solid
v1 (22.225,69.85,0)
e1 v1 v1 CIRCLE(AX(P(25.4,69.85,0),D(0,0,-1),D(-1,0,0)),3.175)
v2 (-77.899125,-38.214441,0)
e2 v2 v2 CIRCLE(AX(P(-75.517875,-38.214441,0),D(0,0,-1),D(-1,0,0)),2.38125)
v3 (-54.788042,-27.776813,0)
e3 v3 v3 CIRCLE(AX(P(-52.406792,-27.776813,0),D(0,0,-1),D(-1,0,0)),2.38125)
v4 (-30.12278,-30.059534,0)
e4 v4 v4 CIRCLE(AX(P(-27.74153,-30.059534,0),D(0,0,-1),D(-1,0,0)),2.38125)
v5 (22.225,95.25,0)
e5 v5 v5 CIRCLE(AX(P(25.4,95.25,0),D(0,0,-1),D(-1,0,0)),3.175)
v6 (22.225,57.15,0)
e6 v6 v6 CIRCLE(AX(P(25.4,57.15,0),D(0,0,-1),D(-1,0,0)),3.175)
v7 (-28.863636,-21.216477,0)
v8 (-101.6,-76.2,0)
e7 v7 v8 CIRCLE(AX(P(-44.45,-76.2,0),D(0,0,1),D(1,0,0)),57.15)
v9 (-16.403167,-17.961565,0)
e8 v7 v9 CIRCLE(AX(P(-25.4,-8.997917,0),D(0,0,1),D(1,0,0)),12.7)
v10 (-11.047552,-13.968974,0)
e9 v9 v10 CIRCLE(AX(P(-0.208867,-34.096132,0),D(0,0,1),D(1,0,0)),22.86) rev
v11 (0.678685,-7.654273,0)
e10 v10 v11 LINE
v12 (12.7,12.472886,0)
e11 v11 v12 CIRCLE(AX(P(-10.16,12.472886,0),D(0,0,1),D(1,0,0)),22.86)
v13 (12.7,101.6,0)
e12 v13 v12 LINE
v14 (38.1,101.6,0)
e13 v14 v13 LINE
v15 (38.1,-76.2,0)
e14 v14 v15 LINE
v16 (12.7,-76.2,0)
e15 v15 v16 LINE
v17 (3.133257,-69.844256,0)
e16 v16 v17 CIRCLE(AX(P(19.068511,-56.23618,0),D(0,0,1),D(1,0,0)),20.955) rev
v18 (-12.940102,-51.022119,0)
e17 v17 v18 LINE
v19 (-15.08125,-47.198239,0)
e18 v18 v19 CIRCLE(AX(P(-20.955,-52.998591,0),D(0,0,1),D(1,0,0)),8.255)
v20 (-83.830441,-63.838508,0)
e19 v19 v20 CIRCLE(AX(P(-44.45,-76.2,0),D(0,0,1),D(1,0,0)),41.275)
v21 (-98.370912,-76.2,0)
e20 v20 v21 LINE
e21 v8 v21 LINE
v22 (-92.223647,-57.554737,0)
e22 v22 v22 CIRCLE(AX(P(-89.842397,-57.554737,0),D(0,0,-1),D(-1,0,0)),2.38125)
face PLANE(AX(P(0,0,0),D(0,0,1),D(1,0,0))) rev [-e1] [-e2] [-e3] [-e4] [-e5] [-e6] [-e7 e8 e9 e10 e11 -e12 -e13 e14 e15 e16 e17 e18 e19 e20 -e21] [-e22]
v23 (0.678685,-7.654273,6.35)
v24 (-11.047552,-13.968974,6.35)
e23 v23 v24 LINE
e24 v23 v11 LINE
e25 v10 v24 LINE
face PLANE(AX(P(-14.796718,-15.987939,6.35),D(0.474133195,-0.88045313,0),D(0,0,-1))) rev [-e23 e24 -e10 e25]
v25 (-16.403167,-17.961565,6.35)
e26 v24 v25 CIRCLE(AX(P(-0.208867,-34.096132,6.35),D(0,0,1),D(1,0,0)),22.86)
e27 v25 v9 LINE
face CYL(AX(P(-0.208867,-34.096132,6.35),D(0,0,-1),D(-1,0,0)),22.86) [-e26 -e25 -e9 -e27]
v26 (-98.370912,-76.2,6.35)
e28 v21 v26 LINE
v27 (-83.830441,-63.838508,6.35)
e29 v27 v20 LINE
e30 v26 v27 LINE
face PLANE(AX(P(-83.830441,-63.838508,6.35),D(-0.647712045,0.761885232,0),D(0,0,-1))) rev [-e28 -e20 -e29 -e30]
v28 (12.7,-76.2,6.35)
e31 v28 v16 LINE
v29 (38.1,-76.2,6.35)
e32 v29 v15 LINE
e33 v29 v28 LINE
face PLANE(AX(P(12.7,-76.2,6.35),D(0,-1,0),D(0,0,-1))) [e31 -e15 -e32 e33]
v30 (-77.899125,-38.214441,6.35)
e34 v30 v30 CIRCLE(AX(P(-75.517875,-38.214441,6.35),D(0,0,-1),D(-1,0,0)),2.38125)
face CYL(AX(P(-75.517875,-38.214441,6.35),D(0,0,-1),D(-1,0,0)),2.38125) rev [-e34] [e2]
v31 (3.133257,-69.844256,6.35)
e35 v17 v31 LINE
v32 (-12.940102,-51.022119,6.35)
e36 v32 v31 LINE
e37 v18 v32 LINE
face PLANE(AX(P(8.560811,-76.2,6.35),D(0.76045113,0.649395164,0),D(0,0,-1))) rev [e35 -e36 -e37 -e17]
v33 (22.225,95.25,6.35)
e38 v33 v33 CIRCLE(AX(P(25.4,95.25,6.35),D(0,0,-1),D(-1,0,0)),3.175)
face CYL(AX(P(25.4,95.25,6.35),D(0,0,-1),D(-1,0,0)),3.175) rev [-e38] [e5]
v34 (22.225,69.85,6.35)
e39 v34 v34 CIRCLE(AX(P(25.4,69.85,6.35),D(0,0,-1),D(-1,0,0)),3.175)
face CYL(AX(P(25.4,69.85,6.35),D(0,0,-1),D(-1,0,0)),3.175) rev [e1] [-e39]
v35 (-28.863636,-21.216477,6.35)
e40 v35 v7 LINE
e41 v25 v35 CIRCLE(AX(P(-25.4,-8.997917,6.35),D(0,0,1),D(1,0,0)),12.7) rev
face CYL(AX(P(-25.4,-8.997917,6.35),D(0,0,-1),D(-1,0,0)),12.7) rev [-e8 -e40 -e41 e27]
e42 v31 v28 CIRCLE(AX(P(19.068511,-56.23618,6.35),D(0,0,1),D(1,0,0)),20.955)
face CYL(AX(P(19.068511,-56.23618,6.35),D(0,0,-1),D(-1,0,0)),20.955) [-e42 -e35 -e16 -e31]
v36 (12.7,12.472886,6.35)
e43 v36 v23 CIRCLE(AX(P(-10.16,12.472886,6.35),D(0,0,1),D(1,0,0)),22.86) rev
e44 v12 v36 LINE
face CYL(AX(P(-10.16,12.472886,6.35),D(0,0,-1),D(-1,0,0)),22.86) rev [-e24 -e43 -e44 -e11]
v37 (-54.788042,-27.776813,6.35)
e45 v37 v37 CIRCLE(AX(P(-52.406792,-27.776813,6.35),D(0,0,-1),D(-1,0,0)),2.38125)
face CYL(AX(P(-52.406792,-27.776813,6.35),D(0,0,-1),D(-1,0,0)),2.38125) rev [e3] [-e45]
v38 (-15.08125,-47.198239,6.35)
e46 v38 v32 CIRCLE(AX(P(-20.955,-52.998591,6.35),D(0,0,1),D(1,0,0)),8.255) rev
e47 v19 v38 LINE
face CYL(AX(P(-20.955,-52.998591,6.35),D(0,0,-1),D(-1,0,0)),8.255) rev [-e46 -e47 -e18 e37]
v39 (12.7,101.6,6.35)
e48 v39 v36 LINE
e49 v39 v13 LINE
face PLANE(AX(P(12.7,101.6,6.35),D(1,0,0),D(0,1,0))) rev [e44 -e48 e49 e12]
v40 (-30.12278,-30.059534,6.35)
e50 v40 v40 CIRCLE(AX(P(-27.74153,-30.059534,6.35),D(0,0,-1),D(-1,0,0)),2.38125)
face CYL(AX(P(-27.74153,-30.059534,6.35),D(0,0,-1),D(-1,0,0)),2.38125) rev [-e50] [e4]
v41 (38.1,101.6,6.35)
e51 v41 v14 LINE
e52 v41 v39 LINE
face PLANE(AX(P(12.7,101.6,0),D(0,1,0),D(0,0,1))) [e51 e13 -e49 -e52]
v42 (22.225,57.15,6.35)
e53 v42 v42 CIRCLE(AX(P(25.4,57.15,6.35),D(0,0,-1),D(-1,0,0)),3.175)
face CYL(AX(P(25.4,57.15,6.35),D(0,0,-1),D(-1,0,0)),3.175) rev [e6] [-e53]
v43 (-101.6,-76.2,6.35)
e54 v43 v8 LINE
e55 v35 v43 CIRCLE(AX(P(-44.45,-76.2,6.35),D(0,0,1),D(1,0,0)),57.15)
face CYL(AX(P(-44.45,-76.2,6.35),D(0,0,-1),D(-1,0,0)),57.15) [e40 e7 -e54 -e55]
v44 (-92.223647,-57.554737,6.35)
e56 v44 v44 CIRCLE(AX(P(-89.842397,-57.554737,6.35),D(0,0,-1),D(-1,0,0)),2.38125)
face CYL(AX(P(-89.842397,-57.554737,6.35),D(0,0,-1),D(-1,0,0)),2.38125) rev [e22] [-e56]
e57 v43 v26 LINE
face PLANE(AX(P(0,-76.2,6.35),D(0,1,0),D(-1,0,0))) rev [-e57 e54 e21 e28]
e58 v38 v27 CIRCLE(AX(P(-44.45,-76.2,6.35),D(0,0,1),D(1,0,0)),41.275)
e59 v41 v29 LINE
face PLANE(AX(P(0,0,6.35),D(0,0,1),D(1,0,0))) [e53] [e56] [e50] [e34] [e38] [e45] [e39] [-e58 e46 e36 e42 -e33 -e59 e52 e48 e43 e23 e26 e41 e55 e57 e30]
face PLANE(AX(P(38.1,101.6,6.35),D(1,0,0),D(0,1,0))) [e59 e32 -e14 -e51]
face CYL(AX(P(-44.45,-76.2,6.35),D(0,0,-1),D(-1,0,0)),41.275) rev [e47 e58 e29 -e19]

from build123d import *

# Parameters (mm, degrees)
BOSS_EXTRUDE1_DEPTH = 6.35
FILLET1_R           = 8.255
SKETCH2_R           = 3.175
CUT_EXTRUDE1_DEPTH  = 128.158650905
CHAMFER2_START      = -126.7457463
CHAMFER2_OUTLINE_W  = 36
CHAMFER2_OUTLINE_H  = 6.35
CHAMFER2_DEPTH      = 83.771913248
FILLET4_R           = 20.955
FILLET5_R           = 12.7
SKETCH3_W           = 25.4
SKETCH3_H           = 25.4
SKETCH3_R           = 3.175
BOSS_EXTRUDE2_DEPTH = 6.35
SKETCH4_W           = 25.4
SKETCH4_H           = 177.8
SKETCH4_R           = 3.175
BOSS_EXTRUDE3_DEPTH = 6.35
SKETCH5_W           = 25.4
SKETCH5_H           = 101.6
CUT_EXTRUDE2_DEPTH  = 144.824345992
CHAMFER3_DEPTH      = 6.35
FILLET7_R           = 22.86
SKETCH6_R           = 2.38125
CUT_EXTRUDE3_DEPTH  = 144.824345992


with BuildPart() as part:
    # Sketch1 → Boss-Extrude1 (new body)
    with BuildSketch(Plane.XY):
        with BuildLine():
            Line((12.7, 76.2), (-12.7, 76.2))
            Line((-12.7, 76.2), (-12.7, -28.680951188))
            ThreePointArc((-12.7, -28.680951188), (-71.390768363, -25.798437524), (-101.6, -76.2))
            Line((-101.6, -76.2), (-85.725, -76.2))
            ThreePointArc((-85.725, -76.2), (-58.470420375, -37.379213847), (-12.7, -49.826469235))
            Line((-12.7, -49.826469235), (-12.7, -76.2))
            Line((-12.7, -76.2), (12.7, -76.2))
            Line((12.7, -76.2), (12.7, 76.2))
        make_face()
    extrude(amount=BOSS_EXTRUDE1_DEPTH)

    # Fillet1
    fillet1_edges = [part.edges().sort_by_distance(p)[0] for p in [
        (-12.7, -49.826469235, 3.175),
    ]]
    fillet(fillet1_edges, radius=FILLET1_R)

    # Chamfer1
    # the kernel refuses this chamfer: 16.925734726, 15.24 mm, written as the material it takes off along each edge
    with BuildSketch(Plane(origin=(-85.725, -76.2, -32.922584323), x_dir=(0.15149402541241913, 0.9884581732498049, 0), z_dir=(0, 0, 1))) as chamfer1_piece_1:
        with BuildLine():
            Line((13.017434015, -0.44343203), (-2.4273823, 12.943386903))
            Line((-2.4273823, 12.943386903), (-2.761989917, 12.89210395))
            ThreePointArc((-2.761989917, 12.89210395), (-1.331569383, 6.453627085), (-0.334607617, -0.051282954))
            Line((-0.334607617, -0.051282954), (0.051282954, -0.334607617))
            ThreePointArc((0.051282954, -0.334607617), (6.510978775, 0.137060785), (12.966151061, -0.778039646))
            Line((12.966151061, -0.778039646), (13.017434015, -0.44343203))
        make_face()
    extrude(amount=72.195168646, mode=Mode.SUBTRACT)

    # Sketch2 → Cut-Extrude1 (cut, through all)
    with BuildSketch(Plane.XY.offset(6.35)):
        with Locations((0, 57.15)):
            Circle(SKETCH2_R)
        with Locations((0, 69.85)):
            Circle(SKETCH2_R)
    extrude(amount=-CUT_EXTRUDE1_DEPTH, mode=Mode.SUBTRACT)

    # Chamfer2: read off the stored shape, not the designer's step
    # Chamfer2 outline → Chamfer2 (cut)
    with BuildSketch(Plane(origin=(0, 0, 0), x_dir=(0.6493951635681026, -0.7604511302735748, 0), z_dir=(0.7604511302735747, 0.6493951635681027, 0)).offset(CHAMFER2_START)):
        with Locations((47, -3.175)):
            Rectangle(CHAMFER2_OUTLINE_W, CHAMFER2_OUTLINE_H)
    extrude(amount=CHAMFER2_DEPTH, mode=Mode.SUBTRACT)

    # Fillet4
    # the kernel refuses this fillet: 20.955 mm, written as the material it takes off along each edge
    with BuildSketch(Plane(origin=(8.560811014, -76.2, 27.244649936), x_dir=(1, 0, 0), z_dir=(0, 0, -1))) as fillet4_piece_1:
        with BuildLine():
            CenterArc((10.50769959, -19.963819717), FILLET4_R, 107.692818626, 31.811166067)
            Line((-5.427553845, -6.355744064), (-5.746258914, -6.083582551))
            Line((-5.746258914, -6.083582551), (-0.318705069, 0.272161513))
            Line((-0.318705069, 0.272161513), (0, 0.4191))
            ThreePointArc((0, 0.4191), (2.069594493, 0.4191), (4.011818774, 0.399276394))
            Line((4.011818774, 0.399276394), (4.139188986, 0))
        make_face()
    extrude(amount=48.139299873, mode=Mode.SUBTRACT)

    # Fillet5
    fillet5_edges = [part.edges().sort_by_distance(p)[0] for p in [
        (-12.7, -28.680951188, 3.175),
    ]]
    fillet(fillet5_edges, radius=FILLET5_R)

    # Sketch3 → Boss-Extrude2 (add)
    with BuildSketch(Plane.XY.offset(6.35)):
        with Locations((0, 88.9)):
            Rectangle(SKETCH3_W, SKETCH3_H)
        with Locations((0, 95.25)):
            Circle(SKETCH3_R, mode=Mode.SUBTRACT)
    extrude(amount=-BOSS_EXTRUDE2_DEPTH)

    # Sketch4 → Boss-Extrude3 (add)
    with BuildSketch(Plane(origin=(0, 0, 0), x_dir=(-1, 0, 0), z_dir=(0, 0, -1))):
        with Locations((-25.4, 12.7)):
            Rectangle(SKETCH4_W, SKETCH4_H)
        with Locations((-25.4, 95.25)):
            Circle(SKETCH4_R, mode=Mode.SUBTRACT)
        with Locations((-25.4, 69.85)):
            Circle(SKETCH4_R, mode=Mode.SUBTRACT)
        with Locations((-25.4, 57.15)):
            Circle(SKETCH4_R, mode=Mode.SUBTRACT)
    extrude(amount=-BOSS_EXTRUDE3_DEPTH)

    # Sketch5 → Cut-Extrude2 (cut, through all)
    with BuildSketch(Plane(origin=(0, 0, 0), x_dir=(-1, 0, 0), z_dir=(0, 0, -1))):
        with Locations((0, 50.8)):
            Rectangle(SKETCH5_W, SKETCH5_H)
    extrude(amount=-CUT_EXTRUDE2_DEPTH, mode=Mode.SUBTRACT)

    # Chamfer3: read off the stored shape, not the designer's step
    # Chamfer3 outline → Chamfer3 (cut)
    with BuildSketch(Plane.XY):
        with BuildLine():
            ThreePointArc((-12.7, -8.997916699), (-13.235467867, -12.646773779), (-14.796717794, -15.98793862))
            Line((-14.796717794, -15.98793862), (12.7, -1.180669249))
            Line((12.7, -1.180669249), (12.7, 0))
            Line((12.7, 0), (-12.7, 0))
            Line((-12.7, 0), (-12.7, -8.997916699))
        make_face()
    extrude(amount=CHAMFER3_DEPTH, mode=Mode.SUBTRACT)

    # Fillet7
    fillet7_edges = [part.edges().sort_by_distance(p)[0] for p in [
        (-14.796717794, -15.98793862, 3.175),
        (12.7, -1.180669249, 3.175),
    ]]
    fillet(fillet7_edges, radius=FILLET7_R)

    # Sketch6 → Cut-Extrude3 (cut, through all)
    with BuildSketch(Plane(origin=(0, 0, 0), x_dir=(-1, 0, 0), z_dir=(0, 0, -1))):
        with Locations((89.842397197, -57.554736727)):
            Circle(SKETCH6_R)
        with Locations((75.517874882, -38.214440689)):
            Circle(SKETCH6_R)
        with Locations((52.406792333, -27.776813182)):
            Circle(SKETCH6_R)
        with Locations((27.741530006, -30.059534069)):
            Circle(SKETCH6_R)
    extrude(amount=-CUT_EXTRUDE3_DEPTH, mode=Mode.SUBTRACT)


solid = part.part
